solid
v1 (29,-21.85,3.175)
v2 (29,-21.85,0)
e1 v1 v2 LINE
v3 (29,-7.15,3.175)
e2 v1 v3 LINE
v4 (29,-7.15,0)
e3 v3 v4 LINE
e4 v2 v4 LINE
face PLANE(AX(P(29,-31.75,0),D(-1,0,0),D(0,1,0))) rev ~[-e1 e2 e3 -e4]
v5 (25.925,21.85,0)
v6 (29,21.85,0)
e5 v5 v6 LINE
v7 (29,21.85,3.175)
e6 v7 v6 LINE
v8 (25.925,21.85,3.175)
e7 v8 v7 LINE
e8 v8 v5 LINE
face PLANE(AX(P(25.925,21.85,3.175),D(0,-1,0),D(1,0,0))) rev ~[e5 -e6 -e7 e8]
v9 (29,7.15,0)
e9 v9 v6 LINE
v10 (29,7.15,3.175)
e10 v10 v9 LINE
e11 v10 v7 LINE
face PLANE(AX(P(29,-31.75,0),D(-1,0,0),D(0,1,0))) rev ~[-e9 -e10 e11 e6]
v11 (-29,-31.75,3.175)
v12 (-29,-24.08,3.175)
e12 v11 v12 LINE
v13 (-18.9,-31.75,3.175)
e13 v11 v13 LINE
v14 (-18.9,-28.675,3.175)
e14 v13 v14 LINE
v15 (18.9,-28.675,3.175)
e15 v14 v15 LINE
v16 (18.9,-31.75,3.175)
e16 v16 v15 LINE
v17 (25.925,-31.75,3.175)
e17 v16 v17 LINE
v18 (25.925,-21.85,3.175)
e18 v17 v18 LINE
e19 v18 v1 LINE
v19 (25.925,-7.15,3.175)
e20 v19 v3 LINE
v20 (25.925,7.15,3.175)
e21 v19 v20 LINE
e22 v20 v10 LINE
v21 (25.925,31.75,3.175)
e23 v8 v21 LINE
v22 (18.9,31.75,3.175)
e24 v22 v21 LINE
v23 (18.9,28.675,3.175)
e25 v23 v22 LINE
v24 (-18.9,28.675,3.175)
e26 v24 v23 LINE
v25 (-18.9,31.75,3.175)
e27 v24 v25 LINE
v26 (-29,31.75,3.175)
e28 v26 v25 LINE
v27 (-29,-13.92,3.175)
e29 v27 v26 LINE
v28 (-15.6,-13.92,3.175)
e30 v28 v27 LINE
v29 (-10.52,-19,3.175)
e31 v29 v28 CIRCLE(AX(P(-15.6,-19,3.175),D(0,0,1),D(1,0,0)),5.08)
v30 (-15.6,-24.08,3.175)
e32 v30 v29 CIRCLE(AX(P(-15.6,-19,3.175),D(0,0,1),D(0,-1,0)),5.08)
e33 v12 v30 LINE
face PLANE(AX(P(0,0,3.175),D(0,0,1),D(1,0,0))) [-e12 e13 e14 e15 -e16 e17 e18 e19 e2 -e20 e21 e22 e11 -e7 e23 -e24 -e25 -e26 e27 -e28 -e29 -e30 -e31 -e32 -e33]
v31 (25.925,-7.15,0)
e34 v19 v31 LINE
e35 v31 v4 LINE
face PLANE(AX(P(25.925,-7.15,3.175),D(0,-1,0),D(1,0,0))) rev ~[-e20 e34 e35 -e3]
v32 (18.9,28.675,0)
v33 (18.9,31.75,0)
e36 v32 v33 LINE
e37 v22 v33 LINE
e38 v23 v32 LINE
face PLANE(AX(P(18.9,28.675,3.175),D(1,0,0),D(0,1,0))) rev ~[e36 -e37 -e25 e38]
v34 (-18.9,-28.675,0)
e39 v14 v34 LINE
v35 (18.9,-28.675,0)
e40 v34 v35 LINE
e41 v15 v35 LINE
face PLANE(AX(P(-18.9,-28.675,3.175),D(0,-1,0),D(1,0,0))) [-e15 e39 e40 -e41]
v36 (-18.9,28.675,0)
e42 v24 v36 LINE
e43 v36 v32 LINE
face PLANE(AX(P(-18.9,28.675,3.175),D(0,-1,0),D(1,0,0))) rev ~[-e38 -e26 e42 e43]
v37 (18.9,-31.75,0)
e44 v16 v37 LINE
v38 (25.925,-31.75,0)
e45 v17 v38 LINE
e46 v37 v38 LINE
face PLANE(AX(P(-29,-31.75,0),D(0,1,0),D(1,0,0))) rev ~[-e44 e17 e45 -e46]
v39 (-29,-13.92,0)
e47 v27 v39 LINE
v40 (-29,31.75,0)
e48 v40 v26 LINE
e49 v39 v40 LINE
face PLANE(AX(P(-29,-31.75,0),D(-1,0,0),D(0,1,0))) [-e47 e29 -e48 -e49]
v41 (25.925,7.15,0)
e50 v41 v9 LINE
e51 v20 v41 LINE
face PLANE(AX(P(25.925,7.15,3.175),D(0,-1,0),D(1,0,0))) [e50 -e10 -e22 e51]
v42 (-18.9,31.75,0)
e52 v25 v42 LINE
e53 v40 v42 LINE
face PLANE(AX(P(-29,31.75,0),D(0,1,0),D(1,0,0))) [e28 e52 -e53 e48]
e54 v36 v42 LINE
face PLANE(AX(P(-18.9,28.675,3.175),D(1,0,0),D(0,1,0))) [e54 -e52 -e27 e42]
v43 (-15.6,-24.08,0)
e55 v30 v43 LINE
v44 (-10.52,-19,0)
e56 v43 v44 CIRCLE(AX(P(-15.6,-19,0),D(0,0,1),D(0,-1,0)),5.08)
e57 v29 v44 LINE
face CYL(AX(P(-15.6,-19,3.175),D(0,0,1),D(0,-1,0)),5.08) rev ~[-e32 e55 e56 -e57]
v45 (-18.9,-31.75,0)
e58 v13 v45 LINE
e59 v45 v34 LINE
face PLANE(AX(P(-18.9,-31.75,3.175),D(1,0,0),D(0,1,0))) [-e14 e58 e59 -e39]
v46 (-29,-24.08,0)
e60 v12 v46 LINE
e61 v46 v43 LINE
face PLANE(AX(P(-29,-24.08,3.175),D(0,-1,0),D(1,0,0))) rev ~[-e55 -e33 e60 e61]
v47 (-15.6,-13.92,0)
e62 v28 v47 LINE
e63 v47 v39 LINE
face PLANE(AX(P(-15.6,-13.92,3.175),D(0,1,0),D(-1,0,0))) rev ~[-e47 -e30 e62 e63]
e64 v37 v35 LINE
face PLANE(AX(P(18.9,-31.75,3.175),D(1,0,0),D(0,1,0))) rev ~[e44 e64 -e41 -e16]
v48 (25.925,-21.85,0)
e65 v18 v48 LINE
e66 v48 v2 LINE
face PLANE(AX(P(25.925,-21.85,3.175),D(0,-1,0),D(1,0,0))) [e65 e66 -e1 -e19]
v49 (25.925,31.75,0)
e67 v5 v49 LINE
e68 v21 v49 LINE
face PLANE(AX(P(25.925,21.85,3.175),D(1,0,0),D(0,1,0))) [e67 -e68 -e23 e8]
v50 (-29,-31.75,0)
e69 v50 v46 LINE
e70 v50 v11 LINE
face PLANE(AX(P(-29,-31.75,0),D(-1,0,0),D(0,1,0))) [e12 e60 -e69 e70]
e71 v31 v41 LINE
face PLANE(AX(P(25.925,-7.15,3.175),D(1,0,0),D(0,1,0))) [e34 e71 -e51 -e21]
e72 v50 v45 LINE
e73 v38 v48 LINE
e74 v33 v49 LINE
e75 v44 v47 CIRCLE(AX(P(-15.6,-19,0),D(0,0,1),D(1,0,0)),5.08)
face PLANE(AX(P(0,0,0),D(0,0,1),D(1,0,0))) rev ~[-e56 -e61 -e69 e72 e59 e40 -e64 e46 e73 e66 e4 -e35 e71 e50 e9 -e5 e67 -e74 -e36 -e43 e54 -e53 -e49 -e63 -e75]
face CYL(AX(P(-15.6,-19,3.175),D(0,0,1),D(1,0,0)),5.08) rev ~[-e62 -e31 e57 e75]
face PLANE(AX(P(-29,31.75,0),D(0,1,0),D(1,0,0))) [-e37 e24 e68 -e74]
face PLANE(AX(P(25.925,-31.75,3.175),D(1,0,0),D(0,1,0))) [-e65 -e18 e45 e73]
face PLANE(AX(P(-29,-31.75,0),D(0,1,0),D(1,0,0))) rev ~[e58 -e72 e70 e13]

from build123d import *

# Parameters (mm, degrees)
F0_W     = 58
F0_H     = 63.5
F1_DEPTH = 3.175
F2_W     = 37.8
F2_H     = 3.075
F2_W_2   = 3.075
F2_H_2   = 14.3
F2_H_3   = 9.9
F3_DEPTH = 25
F5_DEPTH = 25


# Not quite as in the source:
# - a length typed as a fraction of an inch, garbled in the dataset ("3 / 203.2 mm" for 3/8 in), is restored


with BuildPart() as f1:
    # F0 (on Top) → F1 (new body)
    with BuildSketch(Plane.XY):
        Rectangle(F0_W, F0_H)
    extrude(amount=F1_DEPTH)

    # F2 (on face) → F3 (cut)
    with BuildSketch(Plane.XY.offset(3.175)):
        with Locations((0, -30.2125)):
            Rectangle(F2_W, F2_H)
        with Locations((0, 30.2125)):
            Rectangle(F2_W, F2_H)
        with Locations((27.4625, 0)):
            Rectangle(F2_W_2, F2_H_2)
        with Locations((27.4625, -26.8)):
            Rectangle(F2_W_2, F2_H_3)
        with Locations((27.4625, 26.8)):
            Rectangle(F2_W_2, F2_H_3)
    extrude(amount=-F3_DEPTH, mode=Mode.SUBTRACT)

    # F4 (on face) → F5 (cut)
    with BuildSketch(Plane.XY.offset(3.175)):
        with BuildLine():
            ThreePointArc((-15.6, -24.08), (-20.68, -19), (-15.6, -13.92))
            Line((-15.6, -13.92), (-29, -13.92))
            Line((-29, -13.92), (-29, -24.08))
            Line((-29, -24.08), (-15.6, -24.08))
        make_face()
        with BuildLine():
            ThreePointArc((-15.6, -24.08), (-12.0078975516, -22.5921024484), (-10.52, -19))
            ThreePointArc((-10.52, -19), (-12.0078975516, -15.4078975516), (-15.6, -13.92))
            ThreePointArc((-15.6, -13.92), (-20.68, -19), (-15.6, -24.08))
        make_face()
    extrude(amount=-F5_DEPTH, mode=Mode.SUBTRACT)


solid = f1.part
